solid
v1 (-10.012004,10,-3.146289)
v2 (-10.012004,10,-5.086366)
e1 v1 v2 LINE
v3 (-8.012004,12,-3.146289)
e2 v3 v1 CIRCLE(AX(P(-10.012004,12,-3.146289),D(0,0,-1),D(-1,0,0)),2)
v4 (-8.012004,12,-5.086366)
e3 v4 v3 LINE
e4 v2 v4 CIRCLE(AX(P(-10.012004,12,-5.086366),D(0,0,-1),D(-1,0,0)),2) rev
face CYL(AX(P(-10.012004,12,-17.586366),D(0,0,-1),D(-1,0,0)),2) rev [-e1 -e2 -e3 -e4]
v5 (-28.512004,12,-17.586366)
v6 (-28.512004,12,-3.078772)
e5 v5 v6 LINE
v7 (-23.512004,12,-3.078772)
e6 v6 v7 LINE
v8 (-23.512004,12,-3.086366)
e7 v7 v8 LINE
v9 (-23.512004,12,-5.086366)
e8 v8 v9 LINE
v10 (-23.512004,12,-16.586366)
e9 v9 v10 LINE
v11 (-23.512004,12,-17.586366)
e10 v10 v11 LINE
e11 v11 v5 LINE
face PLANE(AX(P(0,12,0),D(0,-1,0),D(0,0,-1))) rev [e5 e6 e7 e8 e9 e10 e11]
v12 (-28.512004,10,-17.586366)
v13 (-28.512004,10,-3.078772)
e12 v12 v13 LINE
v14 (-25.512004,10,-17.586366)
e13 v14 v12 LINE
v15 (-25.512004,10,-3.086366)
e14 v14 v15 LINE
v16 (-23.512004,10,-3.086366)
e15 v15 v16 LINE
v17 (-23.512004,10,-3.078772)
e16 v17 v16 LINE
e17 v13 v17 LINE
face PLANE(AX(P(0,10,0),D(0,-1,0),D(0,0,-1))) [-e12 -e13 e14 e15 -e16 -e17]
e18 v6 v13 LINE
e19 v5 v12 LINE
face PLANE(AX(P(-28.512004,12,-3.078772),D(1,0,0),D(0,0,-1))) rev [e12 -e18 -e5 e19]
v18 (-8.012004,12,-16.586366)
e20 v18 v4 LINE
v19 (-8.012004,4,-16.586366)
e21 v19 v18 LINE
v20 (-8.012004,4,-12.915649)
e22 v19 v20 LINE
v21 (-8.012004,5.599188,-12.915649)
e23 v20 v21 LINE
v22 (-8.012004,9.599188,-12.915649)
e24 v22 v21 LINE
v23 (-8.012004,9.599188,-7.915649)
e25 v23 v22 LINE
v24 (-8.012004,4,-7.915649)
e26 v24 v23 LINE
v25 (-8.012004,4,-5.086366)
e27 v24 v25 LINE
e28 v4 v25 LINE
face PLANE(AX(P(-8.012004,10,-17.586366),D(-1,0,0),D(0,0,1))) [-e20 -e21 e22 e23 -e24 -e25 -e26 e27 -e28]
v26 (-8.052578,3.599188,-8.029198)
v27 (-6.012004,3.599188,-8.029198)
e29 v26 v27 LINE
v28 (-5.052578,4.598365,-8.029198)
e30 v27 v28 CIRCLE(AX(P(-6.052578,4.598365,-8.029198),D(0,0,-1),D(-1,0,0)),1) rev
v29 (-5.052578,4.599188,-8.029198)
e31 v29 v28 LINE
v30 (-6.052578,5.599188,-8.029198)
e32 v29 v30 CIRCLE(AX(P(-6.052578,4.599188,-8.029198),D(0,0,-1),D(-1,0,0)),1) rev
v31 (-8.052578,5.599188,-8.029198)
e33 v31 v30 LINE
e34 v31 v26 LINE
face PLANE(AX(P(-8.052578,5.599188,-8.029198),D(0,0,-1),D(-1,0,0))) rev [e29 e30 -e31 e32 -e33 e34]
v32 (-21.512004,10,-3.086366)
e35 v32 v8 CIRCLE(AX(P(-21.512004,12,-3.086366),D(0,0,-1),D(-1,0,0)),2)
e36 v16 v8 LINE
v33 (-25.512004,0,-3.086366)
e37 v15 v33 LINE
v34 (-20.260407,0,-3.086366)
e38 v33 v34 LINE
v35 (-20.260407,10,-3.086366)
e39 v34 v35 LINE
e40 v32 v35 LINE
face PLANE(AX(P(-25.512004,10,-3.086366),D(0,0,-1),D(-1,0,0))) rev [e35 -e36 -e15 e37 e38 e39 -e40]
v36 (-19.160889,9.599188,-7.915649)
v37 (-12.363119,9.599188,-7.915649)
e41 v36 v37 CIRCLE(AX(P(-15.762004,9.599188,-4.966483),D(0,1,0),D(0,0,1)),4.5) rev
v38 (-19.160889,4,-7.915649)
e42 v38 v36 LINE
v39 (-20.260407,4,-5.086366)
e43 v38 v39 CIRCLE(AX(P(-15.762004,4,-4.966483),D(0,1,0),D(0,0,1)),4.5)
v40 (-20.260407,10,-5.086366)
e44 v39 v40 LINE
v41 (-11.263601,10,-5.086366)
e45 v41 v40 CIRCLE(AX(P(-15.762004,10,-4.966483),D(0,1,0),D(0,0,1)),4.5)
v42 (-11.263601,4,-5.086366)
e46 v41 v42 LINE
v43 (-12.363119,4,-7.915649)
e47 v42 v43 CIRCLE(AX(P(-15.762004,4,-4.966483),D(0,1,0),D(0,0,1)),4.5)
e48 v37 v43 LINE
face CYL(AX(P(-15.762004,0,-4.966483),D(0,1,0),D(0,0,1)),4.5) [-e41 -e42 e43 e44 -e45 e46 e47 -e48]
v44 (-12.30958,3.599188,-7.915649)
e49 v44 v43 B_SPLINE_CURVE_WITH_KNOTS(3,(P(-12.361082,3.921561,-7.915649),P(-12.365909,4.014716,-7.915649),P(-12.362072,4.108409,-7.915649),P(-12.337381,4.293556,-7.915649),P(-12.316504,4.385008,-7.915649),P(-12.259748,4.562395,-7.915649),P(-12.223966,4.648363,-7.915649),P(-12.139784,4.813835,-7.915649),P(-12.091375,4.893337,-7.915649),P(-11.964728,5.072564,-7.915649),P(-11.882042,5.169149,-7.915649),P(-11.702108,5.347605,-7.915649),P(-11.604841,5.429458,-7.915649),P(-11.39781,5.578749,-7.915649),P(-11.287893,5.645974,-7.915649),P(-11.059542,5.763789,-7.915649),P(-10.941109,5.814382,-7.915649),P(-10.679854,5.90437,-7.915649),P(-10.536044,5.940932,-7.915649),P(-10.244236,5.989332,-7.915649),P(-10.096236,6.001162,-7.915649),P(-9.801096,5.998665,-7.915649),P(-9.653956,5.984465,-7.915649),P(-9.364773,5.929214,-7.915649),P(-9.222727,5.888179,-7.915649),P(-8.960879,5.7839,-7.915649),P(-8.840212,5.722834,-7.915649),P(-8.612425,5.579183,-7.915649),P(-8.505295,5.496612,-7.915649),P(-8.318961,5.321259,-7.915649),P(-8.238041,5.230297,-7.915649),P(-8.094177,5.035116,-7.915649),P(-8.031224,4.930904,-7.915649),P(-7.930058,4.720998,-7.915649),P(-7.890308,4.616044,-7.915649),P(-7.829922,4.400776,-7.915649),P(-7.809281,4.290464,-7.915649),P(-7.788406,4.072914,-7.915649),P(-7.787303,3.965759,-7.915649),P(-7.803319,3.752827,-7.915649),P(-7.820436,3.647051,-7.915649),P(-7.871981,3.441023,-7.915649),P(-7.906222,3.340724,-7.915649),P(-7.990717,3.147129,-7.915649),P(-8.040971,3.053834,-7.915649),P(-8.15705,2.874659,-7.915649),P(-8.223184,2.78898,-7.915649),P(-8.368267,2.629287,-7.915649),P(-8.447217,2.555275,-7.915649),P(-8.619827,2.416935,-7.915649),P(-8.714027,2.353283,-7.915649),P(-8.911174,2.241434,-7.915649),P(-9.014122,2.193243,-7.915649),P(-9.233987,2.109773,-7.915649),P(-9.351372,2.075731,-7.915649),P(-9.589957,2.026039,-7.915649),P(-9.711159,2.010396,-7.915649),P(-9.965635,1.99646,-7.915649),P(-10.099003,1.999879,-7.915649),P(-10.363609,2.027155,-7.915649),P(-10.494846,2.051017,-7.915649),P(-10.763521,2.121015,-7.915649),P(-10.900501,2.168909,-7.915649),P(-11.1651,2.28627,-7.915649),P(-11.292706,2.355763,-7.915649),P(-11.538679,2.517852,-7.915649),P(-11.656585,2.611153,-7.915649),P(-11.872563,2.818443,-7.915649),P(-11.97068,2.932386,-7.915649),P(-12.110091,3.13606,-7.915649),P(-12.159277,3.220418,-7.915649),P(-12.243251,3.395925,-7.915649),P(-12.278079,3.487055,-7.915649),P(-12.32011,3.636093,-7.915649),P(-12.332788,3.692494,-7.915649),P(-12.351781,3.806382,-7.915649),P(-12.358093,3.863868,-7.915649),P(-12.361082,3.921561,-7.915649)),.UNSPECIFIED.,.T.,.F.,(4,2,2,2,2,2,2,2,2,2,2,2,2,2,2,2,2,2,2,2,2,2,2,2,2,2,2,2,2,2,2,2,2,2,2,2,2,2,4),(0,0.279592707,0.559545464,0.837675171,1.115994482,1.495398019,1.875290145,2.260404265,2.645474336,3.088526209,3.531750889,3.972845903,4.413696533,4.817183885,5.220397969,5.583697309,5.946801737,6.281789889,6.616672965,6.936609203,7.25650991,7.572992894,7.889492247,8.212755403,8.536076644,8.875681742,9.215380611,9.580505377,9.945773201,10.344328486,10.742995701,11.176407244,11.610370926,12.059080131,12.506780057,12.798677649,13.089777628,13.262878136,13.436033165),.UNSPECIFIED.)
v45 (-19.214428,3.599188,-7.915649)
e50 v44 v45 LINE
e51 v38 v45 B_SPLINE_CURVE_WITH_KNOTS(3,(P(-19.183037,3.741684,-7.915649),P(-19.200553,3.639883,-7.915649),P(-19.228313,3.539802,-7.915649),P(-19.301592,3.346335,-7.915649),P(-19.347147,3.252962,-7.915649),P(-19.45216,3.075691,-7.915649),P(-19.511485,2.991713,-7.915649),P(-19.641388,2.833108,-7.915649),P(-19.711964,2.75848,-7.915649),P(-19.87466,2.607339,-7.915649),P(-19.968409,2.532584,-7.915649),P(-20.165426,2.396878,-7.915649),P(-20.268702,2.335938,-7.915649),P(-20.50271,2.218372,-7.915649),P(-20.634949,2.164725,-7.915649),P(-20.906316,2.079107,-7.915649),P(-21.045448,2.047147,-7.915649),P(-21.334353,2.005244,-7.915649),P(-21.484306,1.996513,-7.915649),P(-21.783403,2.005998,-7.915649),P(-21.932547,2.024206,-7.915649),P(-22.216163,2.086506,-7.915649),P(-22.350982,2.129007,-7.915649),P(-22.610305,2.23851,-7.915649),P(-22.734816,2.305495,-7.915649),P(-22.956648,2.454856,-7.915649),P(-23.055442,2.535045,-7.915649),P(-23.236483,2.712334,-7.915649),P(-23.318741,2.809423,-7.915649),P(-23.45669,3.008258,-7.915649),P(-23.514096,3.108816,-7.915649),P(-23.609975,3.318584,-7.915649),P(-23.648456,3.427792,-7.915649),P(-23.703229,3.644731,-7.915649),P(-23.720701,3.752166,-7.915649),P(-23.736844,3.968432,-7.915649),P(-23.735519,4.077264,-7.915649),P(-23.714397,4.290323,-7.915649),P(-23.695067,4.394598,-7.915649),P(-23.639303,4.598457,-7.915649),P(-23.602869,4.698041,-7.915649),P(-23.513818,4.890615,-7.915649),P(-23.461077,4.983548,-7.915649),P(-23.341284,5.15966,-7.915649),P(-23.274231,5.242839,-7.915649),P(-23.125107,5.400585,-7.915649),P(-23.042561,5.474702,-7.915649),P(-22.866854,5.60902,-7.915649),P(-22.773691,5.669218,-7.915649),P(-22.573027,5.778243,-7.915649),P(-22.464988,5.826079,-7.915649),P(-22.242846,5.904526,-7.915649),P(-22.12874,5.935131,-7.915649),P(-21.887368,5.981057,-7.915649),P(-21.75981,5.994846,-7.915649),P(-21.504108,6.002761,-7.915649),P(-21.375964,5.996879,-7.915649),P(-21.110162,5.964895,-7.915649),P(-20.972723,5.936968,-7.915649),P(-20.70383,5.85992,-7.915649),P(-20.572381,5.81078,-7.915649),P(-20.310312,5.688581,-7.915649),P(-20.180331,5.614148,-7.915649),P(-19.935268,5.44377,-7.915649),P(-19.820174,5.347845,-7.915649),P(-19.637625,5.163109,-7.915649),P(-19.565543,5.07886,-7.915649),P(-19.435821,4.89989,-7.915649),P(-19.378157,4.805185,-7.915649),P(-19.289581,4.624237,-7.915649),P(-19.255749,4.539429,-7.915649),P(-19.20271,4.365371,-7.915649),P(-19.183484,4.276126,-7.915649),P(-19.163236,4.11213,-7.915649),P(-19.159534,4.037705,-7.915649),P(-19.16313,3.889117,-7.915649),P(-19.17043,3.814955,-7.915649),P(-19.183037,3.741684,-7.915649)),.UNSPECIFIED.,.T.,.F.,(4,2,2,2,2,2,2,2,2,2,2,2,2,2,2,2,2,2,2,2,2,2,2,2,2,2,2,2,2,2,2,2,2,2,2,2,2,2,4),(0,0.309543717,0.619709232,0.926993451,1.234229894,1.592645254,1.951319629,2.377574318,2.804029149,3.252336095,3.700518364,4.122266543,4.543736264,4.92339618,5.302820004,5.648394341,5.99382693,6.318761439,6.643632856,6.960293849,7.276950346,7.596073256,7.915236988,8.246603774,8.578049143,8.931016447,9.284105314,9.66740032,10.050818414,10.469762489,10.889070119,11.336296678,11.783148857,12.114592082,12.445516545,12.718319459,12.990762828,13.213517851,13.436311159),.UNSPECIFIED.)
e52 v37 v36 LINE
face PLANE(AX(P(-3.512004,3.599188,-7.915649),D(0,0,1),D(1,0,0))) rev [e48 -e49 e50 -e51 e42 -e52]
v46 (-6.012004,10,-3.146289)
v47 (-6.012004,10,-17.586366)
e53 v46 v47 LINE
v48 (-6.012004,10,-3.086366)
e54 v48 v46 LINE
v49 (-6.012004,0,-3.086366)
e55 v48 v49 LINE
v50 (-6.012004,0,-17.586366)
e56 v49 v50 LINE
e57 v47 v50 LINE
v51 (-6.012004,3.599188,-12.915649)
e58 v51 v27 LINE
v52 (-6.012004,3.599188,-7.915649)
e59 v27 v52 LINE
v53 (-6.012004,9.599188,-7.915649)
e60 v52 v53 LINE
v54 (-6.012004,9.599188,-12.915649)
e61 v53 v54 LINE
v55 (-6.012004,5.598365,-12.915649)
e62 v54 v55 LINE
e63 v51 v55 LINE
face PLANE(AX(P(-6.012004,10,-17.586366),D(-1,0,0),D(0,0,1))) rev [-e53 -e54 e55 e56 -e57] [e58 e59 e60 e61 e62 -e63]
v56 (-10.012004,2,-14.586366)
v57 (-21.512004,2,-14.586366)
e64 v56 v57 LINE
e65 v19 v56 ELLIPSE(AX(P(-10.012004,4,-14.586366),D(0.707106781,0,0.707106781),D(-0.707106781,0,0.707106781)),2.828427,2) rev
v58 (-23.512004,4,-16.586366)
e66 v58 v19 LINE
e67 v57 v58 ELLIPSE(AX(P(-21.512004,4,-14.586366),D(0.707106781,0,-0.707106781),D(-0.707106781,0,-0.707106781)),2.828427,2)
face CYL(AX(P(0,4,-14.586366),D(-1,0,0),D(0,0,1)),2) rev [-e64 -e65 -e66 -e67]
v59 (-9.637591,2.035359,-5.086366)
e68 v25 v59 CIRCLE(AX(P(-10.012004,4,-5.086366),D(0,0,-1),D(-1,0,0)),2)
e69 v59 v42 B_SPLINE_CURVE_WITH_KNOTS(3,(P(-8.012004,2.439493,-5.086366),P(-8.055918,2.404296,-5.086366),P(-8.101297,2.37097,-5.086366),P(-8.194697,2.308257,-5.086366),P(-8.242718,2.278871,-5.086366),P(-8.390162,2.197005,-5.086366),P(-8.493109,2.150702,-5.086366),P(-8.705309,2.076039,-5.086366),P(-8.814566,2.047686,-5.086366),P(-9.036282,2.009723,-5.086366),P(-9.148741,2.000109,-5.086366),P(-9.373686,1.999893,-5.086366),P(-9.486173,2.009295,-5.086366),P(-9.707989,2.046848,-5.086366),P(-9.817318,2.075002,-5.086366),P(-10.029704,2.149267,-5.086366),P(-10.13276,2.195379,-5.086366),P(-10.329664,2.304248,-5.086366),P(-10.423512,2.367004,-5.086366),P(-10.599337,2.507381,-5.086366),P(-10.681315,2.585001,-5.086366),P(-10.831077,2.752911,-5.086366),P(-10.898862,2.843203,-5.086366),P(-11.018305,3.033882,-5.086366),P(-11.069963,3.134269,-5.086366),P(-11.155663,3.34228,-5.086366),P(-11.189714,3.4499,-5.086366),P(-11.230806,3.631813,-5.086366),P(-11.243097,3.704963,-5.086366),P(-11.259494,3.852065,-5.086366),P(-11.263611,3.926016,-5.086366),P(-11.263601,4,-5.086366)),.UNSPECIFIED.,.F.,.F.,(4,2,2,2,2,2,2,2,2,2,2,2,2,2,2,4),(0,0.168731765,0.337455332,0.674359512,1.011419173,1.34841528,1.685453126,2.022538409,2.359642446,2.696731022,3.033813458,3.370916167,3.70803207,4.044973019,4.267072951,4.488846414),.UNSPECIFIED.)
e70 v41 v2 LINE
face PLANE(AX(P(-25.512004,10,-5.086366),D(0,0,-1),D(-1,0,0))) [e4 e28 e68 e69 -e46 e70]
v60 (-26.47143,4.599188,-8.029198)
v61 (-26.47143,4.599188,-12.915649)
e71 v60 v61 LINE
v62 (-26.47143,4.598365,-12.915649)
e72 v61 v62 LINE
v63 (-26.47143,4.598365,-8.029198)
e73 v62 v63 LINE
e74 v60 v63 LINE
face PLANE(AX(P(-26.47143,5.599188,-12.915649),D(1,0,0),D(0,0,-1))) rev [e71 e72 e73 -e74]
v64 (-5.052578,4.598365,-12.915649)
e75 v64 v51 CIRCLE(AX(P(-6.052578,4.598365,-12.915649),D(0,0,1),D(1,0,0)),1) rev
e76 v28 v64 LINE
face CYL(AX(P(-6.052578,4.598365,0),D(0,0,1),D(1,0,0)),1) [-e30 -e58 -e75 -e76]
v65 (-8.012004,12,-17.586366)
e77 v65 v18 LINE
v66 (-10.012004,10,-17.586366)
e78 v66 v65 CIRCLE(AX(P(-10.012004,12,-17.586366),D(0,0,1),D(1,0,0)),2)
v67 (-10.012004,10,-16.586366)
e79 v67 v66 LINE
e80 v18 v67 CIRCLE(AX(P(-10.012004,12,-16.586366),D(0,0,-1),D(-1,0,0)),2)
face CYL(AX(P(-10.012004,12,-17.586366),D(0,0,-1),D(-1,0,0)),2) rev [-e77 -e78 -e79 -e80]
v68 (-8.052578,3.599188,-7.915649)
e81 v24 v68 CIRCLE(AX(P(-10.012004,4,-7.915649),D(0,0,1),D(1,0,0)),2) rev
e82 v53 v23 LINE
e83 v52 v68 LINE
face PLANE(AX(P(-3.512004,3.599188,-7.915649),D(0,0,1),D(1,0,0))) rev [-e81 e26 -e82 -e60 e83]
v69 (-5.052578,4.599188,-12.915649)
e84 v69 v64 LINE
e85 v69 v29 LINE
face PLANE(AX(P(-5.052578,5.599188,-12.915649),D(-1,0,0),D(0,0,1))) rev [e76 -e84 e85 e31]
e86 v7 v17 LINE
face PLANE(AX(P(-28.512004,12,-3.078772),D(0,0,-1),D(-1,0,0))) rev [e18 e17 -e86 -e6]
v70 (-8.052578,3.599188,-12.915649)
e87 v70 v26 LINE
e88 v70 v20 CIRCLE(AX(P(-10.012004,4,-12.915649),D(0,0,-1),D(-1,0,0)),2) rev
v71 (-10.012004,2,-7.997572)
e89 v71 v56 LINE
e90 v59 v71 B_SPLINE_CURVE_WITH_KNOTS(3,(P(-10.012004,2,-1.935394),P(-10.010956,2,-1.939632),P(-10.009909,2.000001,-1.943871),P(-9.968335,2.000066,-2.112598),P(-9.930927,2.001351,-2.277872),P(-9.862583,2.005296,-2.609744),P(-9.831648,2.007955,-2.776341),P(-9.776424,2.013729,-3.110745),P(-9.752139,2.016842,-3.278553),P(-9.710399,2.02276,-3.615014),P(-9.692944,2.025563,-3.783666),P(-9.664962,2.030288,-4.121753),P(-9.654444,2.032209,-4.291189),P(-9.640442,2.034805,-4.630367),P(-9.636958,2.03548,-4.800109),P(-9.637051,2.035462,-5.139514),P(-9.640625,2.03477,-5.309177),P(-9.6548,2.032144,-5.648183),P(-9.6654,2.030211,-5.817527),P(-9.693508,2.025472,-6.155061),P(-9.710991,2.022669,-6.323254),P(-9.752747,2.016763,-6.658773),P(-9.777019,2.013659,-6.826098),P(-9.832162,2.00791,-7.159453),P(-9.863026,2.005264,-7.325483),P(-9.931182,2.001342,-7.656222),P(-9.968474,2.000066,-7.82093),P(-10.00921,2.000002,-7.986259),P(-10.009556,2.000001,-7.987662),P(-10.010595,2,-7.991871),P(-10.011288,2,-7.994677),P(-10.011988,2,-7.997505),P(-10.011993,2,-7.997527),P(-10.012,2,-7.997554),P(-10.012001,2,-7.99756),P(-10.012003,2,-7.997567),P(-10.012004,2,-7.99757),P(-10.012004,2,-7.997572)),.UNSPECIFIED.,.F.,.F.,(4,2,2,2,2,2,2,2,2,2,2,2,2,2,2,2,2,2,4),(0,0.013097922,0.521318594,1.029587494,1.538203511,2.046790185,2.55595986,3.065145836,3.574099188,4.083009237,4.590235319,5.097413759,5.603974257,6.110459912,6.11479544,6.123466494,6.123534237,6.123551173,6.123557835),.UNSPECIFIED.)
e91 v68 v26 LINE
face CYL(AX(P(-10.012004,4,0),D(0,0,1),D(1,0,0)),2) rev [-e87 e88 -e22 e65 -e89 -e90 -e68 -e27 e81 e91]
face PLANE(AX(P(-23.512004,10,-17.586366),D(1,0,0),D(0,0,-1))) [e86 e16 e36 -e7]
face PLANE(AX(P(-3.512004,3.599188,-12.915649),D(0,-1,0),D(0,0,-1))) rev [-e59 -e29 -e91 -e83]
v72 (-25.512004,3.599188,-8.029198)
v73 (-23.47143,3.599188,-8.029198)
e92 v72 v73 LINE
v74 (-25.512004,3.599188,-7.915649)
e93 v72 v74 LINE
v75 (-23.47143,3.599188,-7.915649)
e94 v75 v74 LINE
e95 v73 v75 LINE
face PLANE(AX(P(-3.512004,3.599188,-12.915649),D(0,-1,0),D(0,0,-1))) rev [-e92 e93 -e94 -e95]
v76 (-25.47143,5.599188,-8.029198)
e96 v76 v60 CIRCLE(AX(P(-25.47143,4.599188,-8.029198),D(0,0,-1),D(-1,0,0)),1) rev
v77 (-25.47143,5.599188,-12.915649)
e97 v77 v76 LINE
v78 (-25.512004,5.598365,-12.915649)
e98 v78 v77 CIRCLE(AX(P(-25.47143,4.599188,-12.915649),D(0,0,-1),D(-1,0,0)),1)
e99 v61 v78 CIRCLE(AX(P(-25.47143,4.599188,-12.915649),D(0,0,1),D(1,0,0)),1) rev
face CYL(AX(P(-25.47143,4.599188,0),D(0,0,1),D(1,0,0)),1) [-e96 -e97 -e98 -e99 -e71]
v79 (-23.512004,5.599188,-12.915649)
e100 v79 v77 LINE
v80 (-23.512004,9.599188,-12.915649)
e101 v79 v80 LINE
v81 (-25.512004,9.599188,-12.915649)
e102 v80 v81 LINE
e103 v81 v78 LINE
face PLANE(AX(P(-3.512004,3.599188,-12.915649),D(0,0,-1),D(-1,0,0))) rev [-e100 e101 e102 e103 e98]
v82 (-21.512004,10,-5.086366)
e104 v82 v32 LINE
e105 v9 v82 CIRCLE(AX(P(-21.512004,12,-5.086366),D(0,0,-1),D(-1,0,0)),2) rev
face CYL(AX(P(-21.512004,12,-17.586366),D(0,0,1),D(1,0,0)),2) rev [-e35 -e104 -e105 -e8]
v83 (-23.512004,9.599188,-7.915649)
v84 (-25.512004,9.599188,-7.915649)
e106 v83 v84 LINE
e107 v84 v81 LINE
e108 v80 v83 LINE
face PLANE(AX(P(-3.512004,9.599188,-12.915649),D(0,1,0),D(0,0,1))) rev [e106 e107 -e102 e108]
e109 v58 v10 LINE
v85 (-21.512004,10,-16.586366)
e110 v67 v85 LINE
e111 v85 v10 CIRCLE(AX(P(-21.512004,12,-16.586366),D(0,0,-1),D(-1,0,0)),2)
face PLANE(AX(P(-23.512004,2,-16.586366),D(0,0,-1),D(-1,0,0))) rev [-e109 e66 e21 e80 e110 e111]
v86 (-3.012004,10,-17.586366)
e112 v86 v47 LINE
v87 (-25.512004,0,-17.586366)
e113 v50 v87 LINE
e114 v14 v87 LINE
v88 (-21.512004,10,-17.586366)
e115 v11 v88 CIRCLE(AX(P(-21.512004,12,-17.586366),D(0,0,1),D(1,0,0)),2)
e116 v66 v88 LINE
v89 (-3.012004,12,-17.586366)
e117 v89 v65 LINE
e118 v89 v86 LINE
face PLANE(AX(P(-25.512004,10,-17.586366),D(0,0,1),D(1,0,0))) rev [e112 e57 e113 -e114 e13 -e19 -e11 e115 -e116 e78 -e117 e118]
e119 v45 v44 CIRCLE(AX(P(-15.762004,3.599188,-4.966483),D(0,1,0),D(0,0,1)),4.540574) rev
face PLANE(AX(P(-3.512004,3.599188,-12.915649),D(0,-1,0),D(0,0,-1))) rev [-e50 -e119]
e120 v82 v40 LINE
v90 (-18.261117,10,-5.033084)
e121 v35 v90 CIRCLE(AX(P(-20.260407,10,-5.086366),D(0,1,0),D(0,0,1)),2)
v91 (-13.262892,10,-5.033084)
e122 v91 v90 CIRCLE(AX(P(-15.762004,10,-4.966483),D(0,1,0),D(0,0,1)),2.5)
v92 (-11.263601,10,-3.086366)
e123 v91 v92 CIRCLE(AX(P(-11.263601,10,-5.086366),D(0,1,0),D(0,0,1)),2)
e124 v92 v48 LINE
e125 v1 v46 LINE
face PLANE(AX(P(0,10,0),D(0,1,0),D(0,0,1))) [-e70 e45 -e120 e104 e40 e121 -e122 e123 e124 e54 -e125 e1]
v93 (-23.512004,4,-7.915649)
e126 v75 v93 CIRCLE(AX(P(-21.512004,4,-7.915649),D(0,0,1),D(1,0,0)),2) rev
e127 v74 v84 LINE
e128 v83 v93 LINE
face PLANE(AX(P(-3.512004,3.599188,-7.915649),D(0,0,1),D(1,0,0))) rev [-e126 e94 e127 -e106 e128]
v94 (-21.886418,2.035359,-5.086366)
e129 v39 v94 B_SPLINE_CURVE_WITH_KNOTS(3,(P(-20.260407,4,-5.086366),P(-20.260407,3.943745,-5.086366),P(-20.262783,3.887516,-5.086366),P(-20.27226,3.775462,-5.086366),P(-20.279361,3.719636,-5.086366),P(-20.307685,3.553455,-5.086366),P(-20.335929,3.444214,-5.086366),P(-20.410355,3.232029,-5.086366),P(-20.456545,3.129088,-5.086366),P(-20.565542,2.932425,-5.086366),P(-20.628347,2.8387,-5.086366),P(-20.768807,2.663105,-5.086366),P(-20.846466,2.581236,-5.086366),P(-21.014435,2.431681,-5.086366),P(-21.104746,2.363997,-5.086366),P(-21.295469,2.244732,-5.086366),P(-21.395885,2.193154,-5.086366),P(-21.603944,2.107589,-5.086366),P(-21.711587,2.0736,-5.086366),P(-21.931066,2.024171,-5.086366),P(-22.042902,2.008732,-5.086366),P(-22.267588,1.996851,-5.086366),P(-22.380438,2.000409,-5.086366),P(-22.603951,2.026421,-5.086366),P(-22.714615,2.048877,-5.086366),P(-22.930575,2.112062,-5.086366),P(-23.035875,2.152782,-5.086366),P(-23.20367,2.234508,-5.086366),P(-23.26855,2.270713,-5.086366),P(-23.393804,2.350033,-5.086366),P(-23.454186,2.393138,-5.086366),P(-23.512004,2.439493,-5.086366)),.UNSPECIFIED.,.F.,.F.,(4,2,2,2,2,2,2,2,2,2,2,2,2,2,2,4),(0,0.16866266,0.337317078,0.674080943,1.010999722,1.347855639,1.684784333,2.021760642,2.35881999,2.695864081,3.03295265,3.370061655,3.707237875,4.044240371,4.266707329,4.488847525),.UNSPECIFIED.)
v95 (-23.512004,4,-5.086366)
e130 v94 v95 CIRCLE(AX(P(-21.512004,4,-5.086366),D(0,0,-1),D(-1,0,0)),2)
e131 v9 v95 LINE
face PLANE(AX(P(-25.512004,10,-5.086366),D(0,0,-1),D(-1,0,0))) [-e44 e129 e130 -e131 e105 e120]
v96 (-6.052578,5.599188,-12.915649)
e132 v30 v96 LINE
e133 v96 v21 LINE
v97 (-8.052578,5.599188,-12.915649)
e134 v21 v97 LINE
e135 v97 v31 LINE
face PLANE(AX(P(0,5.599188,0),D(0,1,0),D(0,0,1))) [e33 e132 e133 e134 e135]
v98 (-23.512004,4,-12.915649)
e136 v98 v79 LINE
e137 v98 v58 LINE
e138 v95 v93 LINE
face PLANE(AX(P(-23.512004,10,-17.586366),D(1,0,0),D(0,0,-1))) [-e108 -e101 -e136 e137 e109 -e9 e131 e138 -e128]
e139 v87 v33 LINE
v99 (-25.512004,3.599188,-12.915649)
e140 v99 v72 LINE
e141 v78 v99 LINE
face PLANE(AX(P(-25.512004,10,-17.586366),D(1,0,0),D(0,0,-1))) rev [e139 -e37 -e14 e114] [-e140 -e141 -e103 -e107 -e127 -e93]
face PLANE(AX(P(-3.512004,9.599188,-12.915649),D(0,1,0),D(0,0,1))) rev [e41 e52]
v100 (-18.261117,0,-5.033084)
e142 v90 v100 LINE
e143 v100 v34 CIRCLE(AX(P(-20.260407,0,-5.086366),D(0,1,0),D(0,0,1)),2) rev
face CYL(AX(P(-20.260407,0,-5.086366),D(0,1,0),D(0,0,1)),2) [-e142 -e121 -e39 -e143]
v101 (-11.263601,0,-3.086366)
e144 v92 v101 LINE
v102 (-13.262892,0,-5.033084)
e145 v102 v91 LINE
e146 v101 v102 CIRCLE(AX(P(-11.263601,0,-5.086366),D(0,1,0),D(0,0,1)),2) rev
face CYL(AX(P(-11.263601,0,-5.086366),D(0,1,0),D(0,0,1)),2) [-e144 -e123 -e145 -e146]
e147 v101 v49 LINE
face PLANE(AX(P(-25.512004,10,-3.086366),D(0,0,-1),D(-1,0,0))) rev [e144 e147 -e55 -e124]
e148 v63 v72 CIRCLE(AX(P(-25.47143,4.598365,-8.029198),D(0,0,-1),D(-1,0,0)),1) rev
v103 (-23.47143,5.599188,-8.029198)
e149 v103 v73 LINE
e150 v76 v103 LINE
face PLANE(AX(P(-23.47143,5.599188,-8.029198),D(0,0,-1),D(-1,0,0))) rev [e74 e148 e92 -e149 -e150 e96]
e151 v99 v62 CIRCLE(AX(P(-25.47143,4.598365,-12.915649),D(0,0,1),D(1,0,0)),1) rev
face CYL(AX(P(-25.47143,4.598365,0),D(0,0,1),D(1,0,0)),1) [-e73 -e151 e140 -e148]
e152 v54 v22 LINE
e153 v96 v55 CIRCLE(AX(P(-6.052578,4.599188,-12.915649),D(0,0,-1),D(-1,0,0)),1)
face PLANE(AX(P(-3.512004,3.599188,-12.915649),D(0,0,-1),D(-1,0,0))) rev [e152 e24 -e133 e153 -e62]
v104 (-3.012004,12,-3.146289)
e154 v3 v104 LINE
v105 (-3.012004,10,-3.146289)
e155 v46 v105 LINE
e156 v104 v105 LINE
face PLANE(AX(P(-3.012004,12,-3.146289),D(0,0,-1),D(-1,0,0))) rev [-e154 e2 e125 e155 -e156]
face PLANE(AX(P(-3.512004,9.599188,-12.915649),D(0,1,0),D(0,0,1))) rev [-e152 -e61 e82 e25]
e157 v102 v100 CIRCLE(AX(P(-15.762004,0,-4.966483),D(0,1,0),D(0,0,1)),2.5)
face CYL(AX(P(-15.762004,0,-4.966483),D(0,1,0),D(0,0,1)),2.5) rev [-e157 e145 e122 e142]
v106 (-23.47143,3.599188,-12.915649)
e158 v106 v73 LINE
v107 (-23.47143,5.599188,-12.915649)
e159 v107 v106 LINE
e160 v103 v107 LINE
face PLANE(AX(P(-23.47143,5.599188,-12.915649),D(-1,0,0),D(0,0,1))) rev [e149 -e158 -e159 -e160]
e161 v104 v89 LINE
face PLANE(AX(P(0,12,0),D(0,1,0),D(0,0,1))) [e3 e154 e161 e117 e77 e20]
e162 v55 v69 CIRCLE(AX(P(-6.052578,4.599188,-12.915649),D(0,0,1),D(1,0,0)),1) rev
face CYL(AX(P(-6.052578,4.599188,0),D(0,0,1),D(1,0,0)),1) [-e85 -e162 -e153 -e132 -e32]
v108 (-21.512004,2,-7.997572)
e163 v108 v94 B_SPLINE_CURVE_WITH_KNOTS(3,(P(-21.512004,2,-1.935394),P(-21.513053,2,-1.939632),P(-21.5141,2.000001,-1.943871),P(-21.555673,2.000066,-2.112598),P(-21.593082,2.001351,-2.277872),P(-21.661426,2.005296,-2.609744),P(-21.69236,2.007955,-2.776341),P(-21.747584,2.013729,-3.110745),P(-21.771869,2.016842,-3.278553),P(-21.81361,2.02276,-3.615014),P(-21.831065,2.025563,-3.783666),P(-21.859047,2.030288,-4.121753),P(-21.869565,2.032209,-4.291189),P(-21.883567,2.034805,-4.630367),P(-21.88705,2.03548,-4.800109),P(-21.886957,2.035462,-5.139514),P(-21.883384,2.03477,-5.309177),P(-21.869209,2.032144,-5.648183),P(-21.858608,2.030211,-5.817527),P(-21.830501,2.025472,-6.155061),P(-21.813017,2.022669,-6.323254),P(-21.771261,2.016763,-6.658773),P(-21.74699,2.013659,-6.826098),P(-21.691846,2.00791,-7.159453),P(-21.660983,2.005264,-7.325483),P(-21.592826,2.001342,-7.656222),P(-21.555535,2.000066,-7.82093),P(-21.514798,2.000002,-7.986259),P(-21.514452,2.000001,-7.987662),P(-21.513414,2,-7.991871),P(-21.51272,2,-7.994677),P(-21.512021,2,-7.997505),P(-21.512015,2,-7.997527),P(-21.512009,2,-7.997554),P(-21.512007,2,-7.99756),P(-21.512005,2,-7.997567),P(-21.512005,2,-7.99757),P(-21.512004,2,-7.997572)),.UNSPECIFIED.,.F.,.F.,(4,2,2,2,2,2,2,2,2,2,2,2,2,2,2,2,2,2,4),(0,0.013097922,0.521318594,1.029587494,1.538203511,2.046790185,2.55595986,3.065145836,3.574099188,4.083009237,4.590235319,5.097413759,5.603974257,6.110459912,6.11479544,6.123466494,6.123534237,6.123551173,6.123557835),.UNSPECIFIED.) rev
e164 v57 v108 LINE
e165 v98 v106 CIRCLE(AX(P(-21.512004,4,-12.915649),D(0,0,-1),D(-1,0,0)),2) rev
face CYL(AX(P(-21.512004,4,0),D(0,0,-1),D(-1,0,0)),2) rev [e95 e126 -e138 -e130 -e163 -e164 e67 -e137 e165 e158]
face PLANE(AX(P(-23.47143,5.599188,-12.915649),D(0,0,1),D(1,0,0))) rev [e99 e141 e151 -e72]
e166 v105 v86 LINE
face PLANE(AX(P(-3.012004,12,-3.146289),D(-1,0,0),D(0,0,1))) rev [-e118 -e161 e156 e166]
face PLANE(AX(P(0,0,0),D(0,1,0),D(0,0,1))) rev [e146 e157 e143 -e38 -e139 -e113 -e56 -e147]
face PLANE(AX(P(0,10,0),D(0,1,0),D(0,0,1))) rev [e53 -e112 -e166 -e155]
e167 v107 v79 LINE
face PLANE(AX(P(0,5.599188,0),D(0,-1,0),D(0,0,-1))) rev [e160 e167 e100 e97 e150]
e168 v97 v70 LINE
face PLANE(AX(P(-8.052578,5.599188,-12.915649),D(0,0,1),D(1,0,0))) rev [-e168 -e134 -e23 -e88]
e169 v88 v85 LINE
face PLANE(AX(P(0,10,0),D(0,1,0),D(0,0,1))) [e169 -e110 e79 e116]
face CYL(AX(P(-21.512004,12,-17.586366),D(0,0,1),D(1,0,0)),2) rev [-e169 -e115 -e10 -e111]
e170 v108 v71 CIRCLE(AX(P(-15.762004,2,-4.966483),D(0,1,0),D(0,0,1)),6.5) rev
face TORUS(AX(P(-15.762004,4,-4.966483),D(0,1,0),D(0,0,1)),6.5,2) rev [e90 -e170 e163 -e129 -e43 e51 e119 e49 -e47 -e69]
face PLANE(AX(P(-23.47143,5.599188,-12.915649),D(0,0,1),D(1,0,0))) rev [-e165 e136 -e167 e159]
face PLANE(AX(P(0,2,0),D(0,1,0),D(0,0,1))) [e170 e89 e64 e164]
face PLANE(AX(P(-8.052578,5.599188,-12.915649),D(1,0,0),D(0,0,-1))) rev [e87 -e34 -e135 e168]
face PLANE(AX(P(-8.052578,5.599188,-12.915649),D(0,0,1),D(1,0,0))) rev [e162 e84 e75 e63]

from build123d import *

# Parameters (mm, degrees)
SKETCH1_W           = 19.5
SKETCH1_H           = 14.5
BOSS_EXTRUDE1_DEPTH = 10
SKETCH2_R           = 2.5
CUT_EXTRUDE1_DEPTH  = 10
SHELL1_T            = -2
FILLET1_R           = 2
SKETCH3_W           = 15.5
SKETCH3_H           = 1
CUT_EXTRUDE3_DEPTH  = 8
FILLET2_R           = 2
SKETCH4_W           = 5
SKETCH4_H           = 14.507593663
SKETCH4_H_2         = 14.440076449
BOSS_EXTRUDE2_DEPTH = 2
FILLET3_R           = 2
FILLET4_R           = 2
SKETCH5_W           = 5
SKETCH5_H           = 6
CUT_EXTRUDE4_DEPTH  = 22
SKETCH6_W           = 3
SKETCH6_H           = 4.886451311
BOSS_EXTRUDE3_DEPTH = 2
FILLET5_R           = 1


# Some blends are built 0.0001 mm under size
with BuildPart() as part:
    # Sketch1 → Boss-Extrude1 (new body)
    with BuildSketch(Plane(origin=(0, 0, 0), x_dir=(1, 0, 0), z_dir=(0, 1, 0))):
        with Locations((-15.762004242, 10.336365648)):
            Rectangle(SKETCH1_W, SKETCH1_H)
    extrude(amount=BOSS_EXTRUDE1_DEPTH)

    # Sketch2 → Cut-Extrude1 (cut)
    with BuildSketch(Plane(origin=(0, 10, 0), x_dir=(1, 0, 0), z_dir=(0, 1, 0))):
        with Locations((-15.762004242, 4.966482791)):
            Circle(SKETCH2_R)
    extrude(amount=-CUT_EXTRUDE1_DEPTH, mode=Mode.SUBTRACT)

    # Shell1
    shell1_openings = [part.faces().sort_by_distance(p)[0] for p in [
        (-15.762004242, 10, -10.695281365),
    ]]
    offset(amount=SHELL1_T, openings=shell1_openings, kind=Kind.INTERSECTION)

    # Fillet1
    fillet1_edges = [part.edges().sort_by_distance(p)[0] for p in [
        (-17.409778355, 5, -3.086365648),
        (-14.114230128, 5, -3.086365648),
    ]]
    fillet(fillet1_edges, radius=FILLET1_R)

    # Sketch3 → Cut-Extrude3 (cut)
    with BuildSketch(Plane(origin=(0, 10, 0), x_dir=(1, 0, 0), z_dir=(0, 1, 0))):
        with Locations((-15.762004242, 16.086365648)):
            Rectangle(SKETCH3_W, SKETCH3_H)
    extrude(amount=-CUT_EXTRUDE3_DEPTH, mode=Mode.SUBTRACT)

    # Fillet2
    # the kernel refuses this fillet: 2 mm, written as the material it adds along each edge
    with BuildSketch(Plane(origin=(-15.762004242, 2, -4.966482791), x_dir=(0.4658564831234789, 0, 0.8848602924370738), z_dir=(-0.8848602924370738, 0, 0.4658564831234789))) as fillet2_piece_1_section:
        with BuildLine():
            CenterArc((4.5 + FILLET2_R, FILLET2_R), FILLET2_R, 180, 90)
            Line((4.5, FILLET2_R), (4.5, 0))
            Line((4.5, 0), (4.5 + FILLET2_R, 0))
        make_face()
    fillet2_piece_1 = revolve(axis=Axis((-15.762004242, 2, -4.966482791), (0, 1, 0)), revolution_arc=304.468667484, mode=Mode.PRIVATE)
    fillet2_piece_1 = split(fillet2_piece_1, bisect_by=Plane(origin=(-15.762004242, 2.56810824, -5.086365648), z_dir=(0, 0, -1)), keep=Keep.TOP, mode=Mode.PRIVATE)
    add(fillet2_piece_1)
    with BuildSketch(Plane(origin=(-8.012004242, 2, -16.586365648), x_dir=(-1, 0, 0), z_dir=(0, 0, 1)), Plane(origin=(-23.512004242, 2, -5.086365648), x_dir=(1, 0, 0), z_dir=(0, 0, -1))) as fillet2_piece_2:
        with BuildLine():
            CenterArc((FILLET2_R, -FILLET2_R), FILLET2_R, 90, 90)
            Line((0, -FILLET2_R), (0, 0))
            Line((0, 0), (FILLET2_R, 0))
        make_face()
    extrude(amount=11.5)
    with BuildSketch(Plane(origin=(-8.012004242, 2, -16.586365648), x_dir=(0, 1, 0), z_dir=(-1, 0, 0))) as fillet2_piece_3:
        with BuildLine():
            CenterArc((FILLET2_R, -FILLET2_R), FILLET2_R, 90, 90)
            Line((0, -FILLET2_R), (0, 0))
            Line((0, 0), (FILLET2_R, 0))
        make_face()
    extrude(amount=15.5)

    # Sketch4 → Boss-Extrude2 (add)
    with BuildSketch(Plane(origin=(0, 10, 0), x_dir=(1, 0, 0), z_dir=(0, 1, 0))):
        with Locations((-26.012004242, 10.332568817)):
            Rectangle(SKETCH4_W, SKETCH4_H)
        with Locations((-5.512004242, 10.366327424)):
            Rectangle(SKETCH4_W, SKETCH4_H_2)
    extrude(amount=BOSS_EXTRUDE2_DEPTH)

    # Fillet3
    fillet3_edges = [part.edges().sort_by_distance(p)[0] for p in [
        (-8.012004242, 10, -4.116327424),
        (-23.512004242, 10, -4.086365648),
    ]]
    fillet(fillet3_edges, radius=FILLET3_R - 0.0001)  # a hair under: the kernel refuses the full size

    # Fillet4
    fillet4_edges = [part.edges().sort_by_distance(p)[0] for p in [
        (-23.512004242, 10, -17.086365648),
        (-8.012004242, 10, -17.086365648),
    ]]
    fillet(fillet4_edges, radius=FILLET4_R - 0.0001)  # a hair under: the kernel refuses the full size

    # Sketch5 → Cut-Extrude4 (cut)
    with BuildSketch(Plane.ZY.offset(25.512004242)):
        with Locations((-10.415649008, 6.599188408)):
            Rectangle(SKETCH5_W, SKETCH5_H)
    extrude(amount=-CUT_EXTRUDE4_DEPTH, mode=Mode.SUBTRACT)

    # Sketch6 → Boss-Extrude3 (add)
    with BuildSketch(Plane(origin=(0, 3.599188408, 0), x_dir=(1, 0, 0), z_dir=(0, 1, 0))):
        with Locations((-24.971430195, 10.472423353)):
            Rectangle(SKETCH6_W, SKETCH6_H)
        with Locations((-6.552578288, 10.472423353)):
            Rectangle(SKETCH6_W, SKETCH6_H)
    extrude(amount=BOSS_EXTRUDE3_DEPTH)

    # Fillet5
    # the kernel refuses this fillet: 1 mm, written as the material it takes off along each edge
    with BuildSketch(Plane(origin=(-5.052578288, 3.599188408, -15.415649008), x_dir=(0, 1, 0), z_dir=(0, 0, 1))) as fillet5_piece_1_section:
        with BuildLine():
            CenterArc((FILLET5_R, FILLET5_R), FILLET5_R, 180, 90)
            Line((0, FILLET5_R), (0, 0))
            Line((0, 0), (FILLET5_R, 0))
        make_face()
    fillet5_piece_1 = extrude(amount=9.886451311, mode=Mode.PRIVATE)
    fillet5_piece_1 = split(fillet5_piece_1, bisect_by=Plane(origin=(-6.012004242, 3.822567924, -10.472423353), z_dir=(1, 0, 0)), keep=Keep.TOP, mode=Mode.PRIVATE)
    add(fillet5_piece_1, mode=Mode.SUBTRACT)
    with BuildSketch(Plane(origin=(-5.052578288, 5.599188408, -12.915649008), x_dir=(-1, 0, 0), z_dir=(0, 0, 1))) as fillet5_piece_2:
        with BuildLine():
            CenterArc((FILLET5_R, FILLET5_R), FILLET5_R, 180, 90)
            Line((0, FILLET5_R), (0, 0))
            Line((0, 0), (FILLET5_R, 0))
        make_face()
    extrude(amount=4.886451311, mode=Mode.SUBTRACT)
    with BuildSketch(Plane(origin=(-26.471430195, 3.599188408, -15.415649008), x_dir=(1, 0, 0), z_dir=(0, 0, 1))) as fillet5_piece_3_section:
        with BuildLine():
            CenterArc((FILLET5_R, FILLET5_R), FILLET5_R, 180, 90)
            Line((0, FILLET5_R), (0, 0))
            Line((0, 0), (FILLET5_R, 0))
        make_face()
    fillet5_piece_3 = extrude(amount=9.886451311, mode=Mode.PRIVATE)
    fillet5_piece_3 = split(fillet5_piece_3, bisect_by=Plane(origin=(-25.512004242, 3.822567924, -10.472423353), z_dir=(-1, 0, 0)), keep=Keep.TOP, mode=Mode.PRIVATE)
    add(fillet5_piece_3, mode=Mode.SUBTRACT)
    with BuildSketch(Plane(origin=(-26.471430195, 5.599188408, -12.915649008), x_dir=(1, 0, 0), z_dir=(0, 0, 1))) as fillet5_piece_4:
        with BuildLine():
            CenterArc((FILLET5_R, -FILLET5_R), FILLET5_R, 90, 90)
            Line((0, -FILLET5_R), (0, 0))
            Line((0, 0), (FILLET5_R, 0))
        make_face()
    extrude(amount=4.886451311, mode=Mode.SUBTRACT)


solid = part.part
